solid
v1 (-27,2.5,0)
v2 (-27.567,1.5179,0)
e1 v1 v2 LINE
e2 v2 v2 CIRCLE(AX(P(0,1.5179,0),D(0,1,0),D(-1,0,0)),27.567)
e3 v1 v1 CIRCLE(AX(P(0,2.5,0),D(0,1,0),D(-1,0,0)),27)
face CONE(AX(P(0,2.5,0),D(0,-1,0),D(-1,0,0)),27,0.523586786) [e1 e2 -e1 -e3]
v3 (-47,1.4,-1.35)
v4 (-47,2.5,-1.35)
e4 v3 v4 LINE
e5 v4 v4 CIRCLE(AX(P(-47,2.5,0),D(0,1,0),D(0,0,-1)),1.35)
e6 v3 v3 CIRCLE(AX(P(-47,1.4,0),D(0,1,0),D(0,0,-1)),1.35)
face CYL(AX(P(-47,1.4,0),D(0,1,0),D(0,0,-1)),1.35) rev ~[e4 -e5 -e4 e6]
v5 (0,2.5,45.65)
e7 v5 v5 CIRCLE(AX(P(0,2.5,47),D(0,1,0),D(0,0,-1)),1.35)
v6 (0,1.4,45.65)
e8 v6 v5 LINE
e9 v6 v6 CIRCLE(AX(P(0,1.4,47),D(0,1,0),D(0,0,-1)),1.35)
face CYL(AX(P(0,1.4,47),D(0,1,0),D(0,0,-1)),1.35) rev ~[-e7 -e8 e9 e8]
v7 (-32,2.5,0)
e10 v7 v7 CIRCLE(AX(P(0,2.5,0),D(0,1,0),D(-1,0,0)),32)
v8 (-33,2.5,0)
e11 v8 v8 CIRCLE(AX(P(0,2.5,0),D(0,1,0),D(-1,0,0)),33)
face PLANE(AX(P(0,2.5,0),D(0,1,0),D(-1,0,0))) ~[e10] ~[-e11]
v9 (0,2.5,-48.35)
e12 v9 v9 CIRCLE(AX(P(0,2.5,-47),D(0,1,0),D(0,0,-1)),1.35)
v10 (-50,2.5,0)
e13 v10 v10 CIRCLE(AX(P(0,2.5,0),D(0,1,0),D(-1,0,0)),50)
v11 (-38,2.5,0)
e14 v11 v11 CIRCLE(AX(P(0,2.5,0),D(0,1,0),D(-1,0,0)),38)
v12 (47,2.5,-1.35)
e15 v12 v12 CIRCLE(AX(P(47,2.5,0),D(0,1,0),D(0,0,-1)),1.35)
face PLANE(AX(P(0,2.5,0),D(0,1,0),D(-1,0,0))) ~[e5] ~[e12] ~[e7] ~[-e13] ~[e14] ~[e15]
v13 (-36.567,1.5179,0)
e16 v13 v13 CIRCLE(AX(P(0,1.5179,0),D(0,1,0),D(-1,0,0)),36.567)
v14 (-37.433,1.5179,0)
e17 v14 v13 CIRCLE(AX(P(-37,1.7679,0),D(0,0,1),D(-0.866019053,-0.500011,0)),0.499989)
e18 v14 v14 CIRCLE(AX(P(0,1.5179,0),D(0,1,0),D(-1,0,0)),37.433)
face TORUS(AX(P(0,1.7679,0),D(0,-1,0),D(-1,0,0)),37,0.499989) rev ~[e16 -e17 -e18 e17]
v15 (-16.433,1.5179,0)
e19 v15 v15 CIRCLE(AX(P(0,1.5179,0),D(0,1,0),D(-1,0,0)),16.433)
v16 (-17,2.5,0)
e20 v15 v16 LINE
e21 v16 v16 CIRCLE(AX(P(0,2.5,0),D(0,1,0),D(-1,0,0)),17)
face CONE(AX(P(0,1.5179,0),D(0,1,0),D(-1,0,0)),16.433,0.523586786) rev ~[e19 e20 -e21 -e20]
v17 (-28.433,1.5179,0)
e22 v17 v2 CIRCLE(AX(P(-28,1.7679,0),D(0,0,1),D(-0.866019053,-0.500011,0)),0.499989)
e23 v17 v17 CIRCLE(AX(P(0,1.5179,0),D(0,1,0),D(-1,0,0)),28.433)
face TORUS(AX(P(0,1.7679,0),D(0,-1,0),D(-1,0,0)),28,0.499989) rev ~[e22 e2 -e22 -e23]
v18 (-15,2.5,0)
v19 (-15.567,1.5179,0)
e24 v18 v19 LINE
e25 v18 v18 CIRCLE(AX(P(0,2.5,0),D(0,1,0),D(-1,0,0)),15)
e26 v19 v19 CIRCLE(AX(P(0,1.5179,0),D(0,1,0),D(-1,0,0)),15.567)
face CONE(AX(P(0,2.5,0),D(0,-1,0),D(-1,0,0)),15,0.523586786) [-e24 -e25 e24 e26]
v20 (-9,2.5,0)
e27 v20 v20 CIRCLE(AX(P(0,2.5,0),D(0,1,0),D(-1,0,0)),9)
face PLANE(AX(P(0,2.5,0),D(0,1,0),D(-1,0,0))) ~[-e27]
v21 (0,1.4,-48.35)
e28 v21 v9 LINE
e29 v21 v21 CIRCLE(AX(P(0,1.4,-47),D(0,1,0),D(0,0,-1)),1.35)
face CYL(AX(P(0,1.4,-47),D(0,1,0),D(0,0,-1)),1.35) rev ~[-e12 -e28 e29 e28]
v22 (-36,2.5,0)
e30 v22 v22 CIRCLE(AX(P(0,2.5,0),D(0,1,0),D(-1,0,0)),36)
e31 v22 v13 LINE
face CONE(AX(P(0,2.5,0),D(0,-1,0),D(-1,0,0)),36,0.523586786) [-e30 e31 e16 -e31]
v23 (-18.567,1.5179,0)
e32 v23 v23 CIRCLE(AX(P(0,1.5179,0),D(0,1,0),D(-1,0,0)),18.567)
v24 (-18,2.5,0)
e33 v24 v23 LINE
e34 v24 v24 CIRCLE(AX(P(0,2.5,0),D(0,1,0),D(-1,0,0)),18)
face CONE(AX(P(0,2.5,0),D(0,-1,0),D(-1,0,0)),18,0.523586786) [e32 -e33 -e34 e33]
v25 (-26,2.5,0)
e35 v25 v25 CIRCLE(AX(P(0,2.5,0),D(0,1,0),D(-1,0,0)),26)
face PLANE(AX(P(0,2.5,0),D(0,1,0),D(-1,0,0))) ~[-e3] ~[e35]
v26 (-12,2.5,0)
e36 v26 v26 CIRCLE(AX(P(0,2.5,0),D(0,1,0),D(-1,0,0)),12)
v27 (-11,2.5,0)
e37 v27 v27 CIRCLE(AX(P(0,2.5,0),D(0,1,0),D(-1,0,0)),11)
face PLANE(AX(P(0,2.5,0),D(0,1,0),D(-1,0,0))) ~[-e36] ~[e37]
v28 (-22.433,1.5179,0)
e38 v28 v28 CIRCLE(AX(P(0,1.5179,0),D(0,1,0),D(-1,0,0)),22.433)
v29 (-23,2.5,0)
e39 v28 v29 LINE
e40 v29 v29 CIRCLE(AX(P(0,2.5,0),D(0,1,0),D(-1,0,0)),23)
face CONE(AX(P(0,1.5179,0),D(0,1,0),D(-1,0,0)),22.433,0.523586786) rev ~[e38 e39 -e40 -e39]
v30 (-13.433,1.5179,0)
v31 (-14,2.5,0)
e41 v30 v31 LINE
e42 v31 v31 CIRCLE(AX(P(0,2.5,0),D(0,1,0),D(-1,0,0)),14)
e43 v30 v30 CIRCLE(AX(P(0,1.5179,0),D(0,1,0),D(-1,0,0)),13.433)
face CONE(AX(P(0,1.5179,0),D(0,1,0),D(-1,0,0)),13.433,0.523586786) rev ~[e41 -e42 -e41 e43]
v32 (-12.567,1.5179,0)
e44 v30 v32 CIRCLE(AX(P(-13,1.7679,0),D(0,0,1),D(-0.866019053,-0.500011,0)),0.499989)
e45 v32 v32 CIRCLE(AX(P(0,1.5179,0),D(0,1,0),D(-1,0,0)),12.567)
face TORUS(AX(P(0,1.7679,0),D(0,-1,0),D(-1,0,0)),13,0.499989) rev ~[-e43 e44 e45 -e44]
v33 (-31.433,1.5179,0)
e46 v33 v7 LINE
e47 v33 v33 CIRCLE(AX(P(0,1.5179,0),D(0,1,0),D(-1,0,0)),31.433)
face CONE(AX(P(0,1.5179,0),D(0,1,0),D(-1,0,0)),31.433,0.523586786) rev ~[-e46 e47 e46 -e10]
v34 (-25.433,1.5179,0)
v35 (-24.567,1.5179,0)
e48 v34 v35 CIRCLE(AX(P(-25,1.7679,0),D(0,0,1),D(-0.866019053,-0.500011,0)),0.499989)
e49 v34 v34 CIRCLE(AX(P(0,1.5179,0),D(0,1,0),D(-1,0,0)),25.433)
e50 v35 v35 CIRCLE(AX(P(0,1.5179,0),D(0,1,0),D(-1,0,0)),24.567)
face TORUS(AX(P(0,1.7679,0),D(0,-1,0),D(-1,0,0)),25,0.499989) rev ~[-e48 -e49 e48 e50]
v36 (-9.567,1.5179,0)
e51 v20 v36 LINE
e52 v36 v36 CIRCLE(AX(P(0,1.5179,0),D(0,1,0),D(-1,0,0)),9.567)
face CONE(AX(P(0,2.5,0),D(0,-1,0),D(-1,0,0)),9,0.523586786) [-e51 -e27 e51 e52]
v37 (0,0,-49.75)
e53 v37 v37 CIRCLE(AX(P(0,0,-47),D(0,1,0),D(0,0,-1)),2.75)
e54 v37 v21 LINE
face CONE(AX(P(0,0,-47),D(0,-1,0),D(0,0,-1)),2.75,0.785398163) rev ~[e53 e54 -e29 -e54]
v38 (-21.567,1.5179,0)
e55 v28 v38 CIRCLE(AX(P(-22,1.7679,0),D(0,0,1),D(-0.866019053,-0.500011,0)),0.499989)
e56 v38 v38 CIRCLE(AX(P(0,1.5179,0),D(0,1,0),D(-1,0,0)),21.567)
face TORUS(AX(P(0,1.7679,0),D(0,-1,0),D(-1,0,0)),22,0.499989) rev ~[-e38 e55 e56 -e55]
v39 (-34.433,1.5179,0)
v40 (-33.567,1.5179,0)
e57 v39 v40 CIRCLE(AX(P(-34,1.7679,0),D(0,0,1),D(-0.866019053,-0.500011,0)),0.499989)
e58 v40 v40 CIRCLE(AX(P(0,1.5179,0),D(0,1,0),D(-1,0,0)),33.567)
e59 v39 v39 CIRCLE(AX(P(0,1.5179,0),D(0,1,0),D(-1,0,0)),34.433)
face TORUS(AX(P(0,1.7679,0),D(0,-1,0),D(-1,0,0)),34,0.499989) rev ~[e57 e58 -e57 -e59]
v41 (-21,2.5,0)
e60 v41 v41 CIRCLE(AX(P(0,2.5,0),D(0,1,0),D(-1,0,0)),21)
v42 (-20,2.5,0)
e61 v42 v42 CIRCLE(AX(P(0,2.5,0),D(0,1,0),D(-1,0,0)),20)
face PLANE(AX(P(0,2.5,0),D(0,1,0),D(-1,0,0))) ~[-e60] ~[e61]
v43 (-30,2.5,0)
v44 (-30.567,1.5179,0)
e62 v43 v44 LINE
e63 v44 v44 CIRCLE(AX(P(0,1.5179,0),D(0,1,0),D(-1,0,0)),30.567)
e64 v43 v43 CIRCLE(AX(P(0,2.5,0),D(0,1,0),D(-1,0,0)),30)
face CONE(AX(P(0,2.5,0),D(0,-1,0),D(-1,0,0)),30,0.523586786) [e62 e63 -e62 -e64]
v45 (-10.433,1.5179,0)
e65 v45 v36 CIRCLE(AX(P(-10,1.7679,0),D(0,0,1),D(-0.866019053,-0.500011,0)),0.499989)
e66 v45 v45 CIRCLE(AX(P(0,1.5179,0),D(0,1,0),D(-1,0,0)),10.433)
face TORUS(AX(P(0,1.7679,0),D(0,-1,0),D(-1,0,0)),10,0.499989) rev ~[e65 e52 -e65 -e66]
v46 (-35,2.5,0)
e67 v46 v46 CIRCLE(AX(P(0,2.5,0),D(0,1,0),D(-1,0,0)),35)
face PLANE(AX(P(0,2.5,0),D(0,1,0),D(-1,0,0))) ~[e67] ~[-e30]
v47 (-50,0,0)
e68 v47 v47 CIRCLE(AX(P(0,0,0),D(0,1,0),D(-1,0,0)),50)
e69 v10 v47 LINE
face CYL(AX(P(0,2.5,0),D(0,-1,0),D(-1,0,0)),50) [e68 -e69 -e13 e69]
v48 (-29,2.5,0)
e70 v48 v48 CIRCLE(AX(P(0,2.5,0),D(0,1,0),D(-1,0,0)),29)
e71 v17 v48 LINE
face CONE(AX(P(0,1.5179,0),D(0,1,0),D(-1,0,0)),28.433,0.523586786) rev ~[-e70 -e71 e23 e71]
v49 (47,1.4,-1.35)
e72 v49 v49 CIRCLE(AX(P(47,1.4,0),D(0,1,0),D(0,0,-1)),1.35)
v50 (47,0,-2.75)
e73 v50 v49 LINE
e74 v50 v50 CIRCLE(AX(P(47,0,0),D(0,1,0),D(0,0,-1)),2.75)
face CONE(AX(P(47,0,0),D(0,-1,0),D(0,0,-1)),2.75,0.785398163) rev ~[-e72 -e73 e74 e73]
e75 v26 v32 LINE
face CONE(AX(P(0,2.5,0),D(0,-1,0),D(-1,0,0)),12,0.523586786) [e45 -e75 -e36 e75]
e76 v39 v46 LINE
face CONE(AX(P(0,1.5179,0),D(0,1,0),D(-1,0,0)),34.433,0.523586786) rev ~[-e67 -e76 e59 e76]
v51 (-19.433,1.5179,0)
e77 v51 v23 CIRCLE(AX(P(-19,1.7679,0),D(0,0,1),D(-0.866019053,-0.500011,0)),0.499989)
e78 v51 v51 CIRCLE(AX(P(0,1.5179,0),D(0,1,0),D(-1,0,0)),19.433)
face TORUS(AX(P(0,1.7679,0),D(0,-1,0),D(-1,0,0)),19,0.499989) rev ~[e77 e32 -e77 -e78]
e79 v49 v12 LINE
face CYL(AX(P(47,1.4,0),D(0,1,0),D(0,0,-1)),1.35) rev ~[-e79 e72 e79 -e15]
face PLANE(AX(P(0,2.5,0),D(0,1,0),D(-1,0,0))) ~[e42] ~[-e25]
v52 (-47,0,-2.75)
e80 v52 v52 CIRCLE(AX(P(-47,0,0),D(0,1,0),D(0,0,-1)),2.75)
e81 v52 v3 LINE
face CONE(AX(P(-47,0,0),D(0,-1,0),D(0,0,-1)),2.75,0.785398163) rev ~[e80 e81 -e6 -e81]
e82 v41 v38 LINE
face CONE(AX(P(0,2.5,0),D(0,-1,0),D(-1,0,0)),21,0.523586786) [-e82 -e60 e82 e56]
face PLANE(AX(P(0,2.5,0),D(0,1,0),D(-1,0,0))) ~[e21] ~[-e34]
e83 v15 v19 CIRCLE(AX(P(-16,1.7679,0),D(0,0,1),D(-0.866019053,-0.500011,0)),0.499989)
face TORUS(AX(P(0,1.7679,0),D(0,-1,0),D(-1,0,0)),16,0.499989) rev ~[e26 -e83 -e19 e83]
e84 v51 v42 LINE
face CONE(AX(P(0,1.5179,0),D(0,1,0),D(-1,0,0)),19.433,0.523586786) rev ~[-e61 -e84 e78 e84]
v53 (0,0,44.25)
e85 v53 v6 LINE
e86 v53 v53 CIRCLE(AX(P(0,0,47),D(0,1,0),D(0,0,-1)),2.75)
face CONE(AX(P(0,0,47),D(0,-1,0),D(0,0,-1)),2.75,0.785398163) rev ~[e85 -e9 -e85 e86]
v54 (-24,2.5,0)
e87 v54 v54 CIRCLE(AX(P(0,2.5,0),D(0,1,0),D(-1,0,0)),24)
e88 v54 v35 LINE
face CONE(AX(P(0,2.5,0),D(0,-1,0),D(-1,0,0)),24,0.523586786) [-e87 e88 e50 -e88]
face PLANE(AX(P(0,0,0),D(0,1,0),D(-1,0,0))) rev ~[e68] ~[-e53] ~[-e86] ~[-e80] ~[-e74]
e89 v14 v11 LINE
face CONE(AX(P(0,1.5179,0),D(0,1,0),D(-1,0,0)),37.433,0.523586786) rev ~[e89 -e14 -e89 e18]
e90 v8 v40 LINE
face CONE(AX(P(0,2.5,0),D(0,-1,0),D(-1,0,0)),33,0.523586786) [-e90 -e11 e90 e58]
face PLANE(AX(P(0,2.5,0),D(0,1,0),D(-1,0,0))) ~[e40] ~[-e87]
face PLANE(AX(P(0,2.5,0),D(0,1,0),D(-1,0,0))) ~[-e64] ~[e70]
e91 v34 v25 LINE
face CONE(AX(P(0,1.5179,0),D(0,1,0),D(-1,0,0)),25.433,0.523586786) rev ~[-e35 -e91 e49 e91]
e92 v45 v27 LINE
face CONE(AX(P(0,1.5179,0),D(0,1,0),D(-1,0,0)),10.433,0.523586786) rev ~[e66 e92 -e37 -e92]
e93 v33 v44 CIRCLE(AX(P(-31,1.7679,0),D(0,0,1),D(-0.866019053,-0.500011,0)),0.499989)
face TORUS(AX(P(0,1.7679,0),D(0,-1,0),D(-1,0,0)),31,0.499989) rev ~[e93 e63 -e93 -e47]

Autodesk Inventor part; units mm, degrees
ref_plane "YZ Plane" through (0, 0, 0) normal (1, 0, 0) x (0, 1, 0)
ref_plane "XZ Plane" through (0, 0, 0) normal (0, 1, 0) x (-1, 0, 0)
ref_plane "XY Plane" through (0, 0, 0) normal (0, 0, 1) x (1, 0, 0)
sketch "Skizze1" plane through (0, 0, 0) normal (0, 0, 1) x (1, 0, 0)
  line L0 (0, 0) -> (0, 15)
  line L1 (0, 2.5) -> (-9, 2.5)
  line L2 (-9, 2.5) -> (-9.567, 1.5179)
  arc A0 (-10.433, 1.5179) -> (-9.567, 1.5179) centre (-10, 1.7679) ccw
  line L3 (-10.433, 1.5179) -> (-11, 2.5)
  line L4 (-11, 2.5) -> (-12, 2.5)
  line L5 (-12, 2.5) -> (-12.567, 1.5179)
  arc A1 (-13.433, 1.5179) -> (-12.567, 1.5179) centre (-13, 1.7679) ccw
  line L6 (-13.433, 1.5179) -> (-14, 2.5)
  line L7 (-10, 1.7679) -> (-10, 5.291) construction
  line L8 (-14, 2.5) -> (-15, 2.5)
  line L9 (-15, 2.5) -> (-15.567, 1.5179)
  arc A2 (-16.433, 1.5179) -> (-15.567, 1.5179) centre (-16, 1.7679) ccw
  line L10 (-16.433, 1.5179) -> (-17, 2.5)
  line L11 (-17, 2.5) -> (-18, 2.5)
  line L12 (-18, 2.5) -> (-18.567, 1.5179)
  arc A3 (-19.433, 1.5179) -> (-18.567, 1.5179) centre (-19, 1.7679) ccw
  line L13 (-19.433, 1.5179) -> (-20, 2.5)
  line L14 (-20, 2.5) -> (-21, 2.5)
  line L15 (-21, 2.5) -> (-21.567, 1.5179)
  arc A4 (-22.433, 1.5179) -> (-21.567, 1.5179) centre (-22, 1.7679) ccw
  line L16 (-22.433, 1.5179) -> (-23, 2.5)
  line L17 (-23, 2.5) -> (-24, 2.5)
  line L18 (-24, 2.5) -> (-24.567, 1.5179)
  arc A5 (-25.433, 1.5179) -> (-24.567, 1.5179) centre (-25, 1.7679) ccw
  line L19 (-25.433, 1.5179) -> (-26, 2.5)
  line L20 (-26, 2.5) -> (-27, 2.5)
  line L21 (-27, 2.5) -> (-27.567, 1.5179)
  arc A6 (-28.433, 1.5179) -> (-27.567, 1.5179) centre (-28, 1.7679) ccw
  line L22 (-28.433, 1.5179) -> (-29, 2.5)
  line L23 (-29, 2.5) -> (-30, 2.5)
  line L24 (-30, 2.5) -> (-30.567, 1.5179)
  arc A7 (-31.433, 1.5179) -> (-30.567, 1.5179) centre (-31, 1.7679) ccw
  line L25 (-31.433, 1.5179) -> (-32, 2.5)
  line L26 (-32, 2.5) -> (-33, 2.5)
  line L27 (-33, 2.5) -> (-33.567, 1.5179)
  arc A8 (-34.433, 1.5179) -> (-33.567, 1.5179) centre (-34, 1.7679) ccw
  line L28 (-34.433, 1.5179) -> (-35, 2.5)
  line L29 (-35, 2.5) -> (-36, 2.5)
  line L30 (-36, 2.5) -> (-36.567, 1.5179)
  arc A9 (-37.433, 1.5179) -> (-36.567, 1.5179) centre (-37, 1.7679) ccw
  line L31 (-37.433, 1.5179) -> (-38, 2.5)
  line L32 (-38, 2.5) -> (-50, 2.5)
  line L33 (-50, 2.5) -> (-50, 0)
  line L34 (-50, 0) -> (0, 0)
  line L35 (0, 2.5) -> (0, 0)
  dimension "d0" = 15
  dimension "d1" = 0.5
  dimension "d2" = 60
  dimension "d3" = 3
  dimension "d4" = 2
  dimension "d7" = 3
  dimension "d12" = 2.5
  dimension "d13" = 100
  dimension "d14" = 20
revolve "Umdrehung1" add sketch "Skizze1" angle 360 about axis through (0, 0, 0) along (0, 1, 0)
sketch "Skizze2" plane through (0, 0, 0) normal (0, 1, 0) x (1, 0, 0)
  line L0 (27.8185, 0) -> (-13.7399, 0) construction
  line L1 (0, -40.9898) -> (0, 18.567) construction
  circle A0 centre (0, 0) radius 18.567 projected
  point P0 (0, -47)
  point P1 (0, 47)
  point P2 (-47, 0)
  point P3 (47, 0)
  dimension "d16" = 94
  dimension "d17" = 94
hole "Bohrung1" at (0, 0, 47) at (0, 0, -47) at (-47, 0, 0) at (47, 0, 0) direction (0, 1, 0) diameter 2.7 end through all countersink diameter 5.5 countersink angle 90
properties part number "plate" material "Gold"
